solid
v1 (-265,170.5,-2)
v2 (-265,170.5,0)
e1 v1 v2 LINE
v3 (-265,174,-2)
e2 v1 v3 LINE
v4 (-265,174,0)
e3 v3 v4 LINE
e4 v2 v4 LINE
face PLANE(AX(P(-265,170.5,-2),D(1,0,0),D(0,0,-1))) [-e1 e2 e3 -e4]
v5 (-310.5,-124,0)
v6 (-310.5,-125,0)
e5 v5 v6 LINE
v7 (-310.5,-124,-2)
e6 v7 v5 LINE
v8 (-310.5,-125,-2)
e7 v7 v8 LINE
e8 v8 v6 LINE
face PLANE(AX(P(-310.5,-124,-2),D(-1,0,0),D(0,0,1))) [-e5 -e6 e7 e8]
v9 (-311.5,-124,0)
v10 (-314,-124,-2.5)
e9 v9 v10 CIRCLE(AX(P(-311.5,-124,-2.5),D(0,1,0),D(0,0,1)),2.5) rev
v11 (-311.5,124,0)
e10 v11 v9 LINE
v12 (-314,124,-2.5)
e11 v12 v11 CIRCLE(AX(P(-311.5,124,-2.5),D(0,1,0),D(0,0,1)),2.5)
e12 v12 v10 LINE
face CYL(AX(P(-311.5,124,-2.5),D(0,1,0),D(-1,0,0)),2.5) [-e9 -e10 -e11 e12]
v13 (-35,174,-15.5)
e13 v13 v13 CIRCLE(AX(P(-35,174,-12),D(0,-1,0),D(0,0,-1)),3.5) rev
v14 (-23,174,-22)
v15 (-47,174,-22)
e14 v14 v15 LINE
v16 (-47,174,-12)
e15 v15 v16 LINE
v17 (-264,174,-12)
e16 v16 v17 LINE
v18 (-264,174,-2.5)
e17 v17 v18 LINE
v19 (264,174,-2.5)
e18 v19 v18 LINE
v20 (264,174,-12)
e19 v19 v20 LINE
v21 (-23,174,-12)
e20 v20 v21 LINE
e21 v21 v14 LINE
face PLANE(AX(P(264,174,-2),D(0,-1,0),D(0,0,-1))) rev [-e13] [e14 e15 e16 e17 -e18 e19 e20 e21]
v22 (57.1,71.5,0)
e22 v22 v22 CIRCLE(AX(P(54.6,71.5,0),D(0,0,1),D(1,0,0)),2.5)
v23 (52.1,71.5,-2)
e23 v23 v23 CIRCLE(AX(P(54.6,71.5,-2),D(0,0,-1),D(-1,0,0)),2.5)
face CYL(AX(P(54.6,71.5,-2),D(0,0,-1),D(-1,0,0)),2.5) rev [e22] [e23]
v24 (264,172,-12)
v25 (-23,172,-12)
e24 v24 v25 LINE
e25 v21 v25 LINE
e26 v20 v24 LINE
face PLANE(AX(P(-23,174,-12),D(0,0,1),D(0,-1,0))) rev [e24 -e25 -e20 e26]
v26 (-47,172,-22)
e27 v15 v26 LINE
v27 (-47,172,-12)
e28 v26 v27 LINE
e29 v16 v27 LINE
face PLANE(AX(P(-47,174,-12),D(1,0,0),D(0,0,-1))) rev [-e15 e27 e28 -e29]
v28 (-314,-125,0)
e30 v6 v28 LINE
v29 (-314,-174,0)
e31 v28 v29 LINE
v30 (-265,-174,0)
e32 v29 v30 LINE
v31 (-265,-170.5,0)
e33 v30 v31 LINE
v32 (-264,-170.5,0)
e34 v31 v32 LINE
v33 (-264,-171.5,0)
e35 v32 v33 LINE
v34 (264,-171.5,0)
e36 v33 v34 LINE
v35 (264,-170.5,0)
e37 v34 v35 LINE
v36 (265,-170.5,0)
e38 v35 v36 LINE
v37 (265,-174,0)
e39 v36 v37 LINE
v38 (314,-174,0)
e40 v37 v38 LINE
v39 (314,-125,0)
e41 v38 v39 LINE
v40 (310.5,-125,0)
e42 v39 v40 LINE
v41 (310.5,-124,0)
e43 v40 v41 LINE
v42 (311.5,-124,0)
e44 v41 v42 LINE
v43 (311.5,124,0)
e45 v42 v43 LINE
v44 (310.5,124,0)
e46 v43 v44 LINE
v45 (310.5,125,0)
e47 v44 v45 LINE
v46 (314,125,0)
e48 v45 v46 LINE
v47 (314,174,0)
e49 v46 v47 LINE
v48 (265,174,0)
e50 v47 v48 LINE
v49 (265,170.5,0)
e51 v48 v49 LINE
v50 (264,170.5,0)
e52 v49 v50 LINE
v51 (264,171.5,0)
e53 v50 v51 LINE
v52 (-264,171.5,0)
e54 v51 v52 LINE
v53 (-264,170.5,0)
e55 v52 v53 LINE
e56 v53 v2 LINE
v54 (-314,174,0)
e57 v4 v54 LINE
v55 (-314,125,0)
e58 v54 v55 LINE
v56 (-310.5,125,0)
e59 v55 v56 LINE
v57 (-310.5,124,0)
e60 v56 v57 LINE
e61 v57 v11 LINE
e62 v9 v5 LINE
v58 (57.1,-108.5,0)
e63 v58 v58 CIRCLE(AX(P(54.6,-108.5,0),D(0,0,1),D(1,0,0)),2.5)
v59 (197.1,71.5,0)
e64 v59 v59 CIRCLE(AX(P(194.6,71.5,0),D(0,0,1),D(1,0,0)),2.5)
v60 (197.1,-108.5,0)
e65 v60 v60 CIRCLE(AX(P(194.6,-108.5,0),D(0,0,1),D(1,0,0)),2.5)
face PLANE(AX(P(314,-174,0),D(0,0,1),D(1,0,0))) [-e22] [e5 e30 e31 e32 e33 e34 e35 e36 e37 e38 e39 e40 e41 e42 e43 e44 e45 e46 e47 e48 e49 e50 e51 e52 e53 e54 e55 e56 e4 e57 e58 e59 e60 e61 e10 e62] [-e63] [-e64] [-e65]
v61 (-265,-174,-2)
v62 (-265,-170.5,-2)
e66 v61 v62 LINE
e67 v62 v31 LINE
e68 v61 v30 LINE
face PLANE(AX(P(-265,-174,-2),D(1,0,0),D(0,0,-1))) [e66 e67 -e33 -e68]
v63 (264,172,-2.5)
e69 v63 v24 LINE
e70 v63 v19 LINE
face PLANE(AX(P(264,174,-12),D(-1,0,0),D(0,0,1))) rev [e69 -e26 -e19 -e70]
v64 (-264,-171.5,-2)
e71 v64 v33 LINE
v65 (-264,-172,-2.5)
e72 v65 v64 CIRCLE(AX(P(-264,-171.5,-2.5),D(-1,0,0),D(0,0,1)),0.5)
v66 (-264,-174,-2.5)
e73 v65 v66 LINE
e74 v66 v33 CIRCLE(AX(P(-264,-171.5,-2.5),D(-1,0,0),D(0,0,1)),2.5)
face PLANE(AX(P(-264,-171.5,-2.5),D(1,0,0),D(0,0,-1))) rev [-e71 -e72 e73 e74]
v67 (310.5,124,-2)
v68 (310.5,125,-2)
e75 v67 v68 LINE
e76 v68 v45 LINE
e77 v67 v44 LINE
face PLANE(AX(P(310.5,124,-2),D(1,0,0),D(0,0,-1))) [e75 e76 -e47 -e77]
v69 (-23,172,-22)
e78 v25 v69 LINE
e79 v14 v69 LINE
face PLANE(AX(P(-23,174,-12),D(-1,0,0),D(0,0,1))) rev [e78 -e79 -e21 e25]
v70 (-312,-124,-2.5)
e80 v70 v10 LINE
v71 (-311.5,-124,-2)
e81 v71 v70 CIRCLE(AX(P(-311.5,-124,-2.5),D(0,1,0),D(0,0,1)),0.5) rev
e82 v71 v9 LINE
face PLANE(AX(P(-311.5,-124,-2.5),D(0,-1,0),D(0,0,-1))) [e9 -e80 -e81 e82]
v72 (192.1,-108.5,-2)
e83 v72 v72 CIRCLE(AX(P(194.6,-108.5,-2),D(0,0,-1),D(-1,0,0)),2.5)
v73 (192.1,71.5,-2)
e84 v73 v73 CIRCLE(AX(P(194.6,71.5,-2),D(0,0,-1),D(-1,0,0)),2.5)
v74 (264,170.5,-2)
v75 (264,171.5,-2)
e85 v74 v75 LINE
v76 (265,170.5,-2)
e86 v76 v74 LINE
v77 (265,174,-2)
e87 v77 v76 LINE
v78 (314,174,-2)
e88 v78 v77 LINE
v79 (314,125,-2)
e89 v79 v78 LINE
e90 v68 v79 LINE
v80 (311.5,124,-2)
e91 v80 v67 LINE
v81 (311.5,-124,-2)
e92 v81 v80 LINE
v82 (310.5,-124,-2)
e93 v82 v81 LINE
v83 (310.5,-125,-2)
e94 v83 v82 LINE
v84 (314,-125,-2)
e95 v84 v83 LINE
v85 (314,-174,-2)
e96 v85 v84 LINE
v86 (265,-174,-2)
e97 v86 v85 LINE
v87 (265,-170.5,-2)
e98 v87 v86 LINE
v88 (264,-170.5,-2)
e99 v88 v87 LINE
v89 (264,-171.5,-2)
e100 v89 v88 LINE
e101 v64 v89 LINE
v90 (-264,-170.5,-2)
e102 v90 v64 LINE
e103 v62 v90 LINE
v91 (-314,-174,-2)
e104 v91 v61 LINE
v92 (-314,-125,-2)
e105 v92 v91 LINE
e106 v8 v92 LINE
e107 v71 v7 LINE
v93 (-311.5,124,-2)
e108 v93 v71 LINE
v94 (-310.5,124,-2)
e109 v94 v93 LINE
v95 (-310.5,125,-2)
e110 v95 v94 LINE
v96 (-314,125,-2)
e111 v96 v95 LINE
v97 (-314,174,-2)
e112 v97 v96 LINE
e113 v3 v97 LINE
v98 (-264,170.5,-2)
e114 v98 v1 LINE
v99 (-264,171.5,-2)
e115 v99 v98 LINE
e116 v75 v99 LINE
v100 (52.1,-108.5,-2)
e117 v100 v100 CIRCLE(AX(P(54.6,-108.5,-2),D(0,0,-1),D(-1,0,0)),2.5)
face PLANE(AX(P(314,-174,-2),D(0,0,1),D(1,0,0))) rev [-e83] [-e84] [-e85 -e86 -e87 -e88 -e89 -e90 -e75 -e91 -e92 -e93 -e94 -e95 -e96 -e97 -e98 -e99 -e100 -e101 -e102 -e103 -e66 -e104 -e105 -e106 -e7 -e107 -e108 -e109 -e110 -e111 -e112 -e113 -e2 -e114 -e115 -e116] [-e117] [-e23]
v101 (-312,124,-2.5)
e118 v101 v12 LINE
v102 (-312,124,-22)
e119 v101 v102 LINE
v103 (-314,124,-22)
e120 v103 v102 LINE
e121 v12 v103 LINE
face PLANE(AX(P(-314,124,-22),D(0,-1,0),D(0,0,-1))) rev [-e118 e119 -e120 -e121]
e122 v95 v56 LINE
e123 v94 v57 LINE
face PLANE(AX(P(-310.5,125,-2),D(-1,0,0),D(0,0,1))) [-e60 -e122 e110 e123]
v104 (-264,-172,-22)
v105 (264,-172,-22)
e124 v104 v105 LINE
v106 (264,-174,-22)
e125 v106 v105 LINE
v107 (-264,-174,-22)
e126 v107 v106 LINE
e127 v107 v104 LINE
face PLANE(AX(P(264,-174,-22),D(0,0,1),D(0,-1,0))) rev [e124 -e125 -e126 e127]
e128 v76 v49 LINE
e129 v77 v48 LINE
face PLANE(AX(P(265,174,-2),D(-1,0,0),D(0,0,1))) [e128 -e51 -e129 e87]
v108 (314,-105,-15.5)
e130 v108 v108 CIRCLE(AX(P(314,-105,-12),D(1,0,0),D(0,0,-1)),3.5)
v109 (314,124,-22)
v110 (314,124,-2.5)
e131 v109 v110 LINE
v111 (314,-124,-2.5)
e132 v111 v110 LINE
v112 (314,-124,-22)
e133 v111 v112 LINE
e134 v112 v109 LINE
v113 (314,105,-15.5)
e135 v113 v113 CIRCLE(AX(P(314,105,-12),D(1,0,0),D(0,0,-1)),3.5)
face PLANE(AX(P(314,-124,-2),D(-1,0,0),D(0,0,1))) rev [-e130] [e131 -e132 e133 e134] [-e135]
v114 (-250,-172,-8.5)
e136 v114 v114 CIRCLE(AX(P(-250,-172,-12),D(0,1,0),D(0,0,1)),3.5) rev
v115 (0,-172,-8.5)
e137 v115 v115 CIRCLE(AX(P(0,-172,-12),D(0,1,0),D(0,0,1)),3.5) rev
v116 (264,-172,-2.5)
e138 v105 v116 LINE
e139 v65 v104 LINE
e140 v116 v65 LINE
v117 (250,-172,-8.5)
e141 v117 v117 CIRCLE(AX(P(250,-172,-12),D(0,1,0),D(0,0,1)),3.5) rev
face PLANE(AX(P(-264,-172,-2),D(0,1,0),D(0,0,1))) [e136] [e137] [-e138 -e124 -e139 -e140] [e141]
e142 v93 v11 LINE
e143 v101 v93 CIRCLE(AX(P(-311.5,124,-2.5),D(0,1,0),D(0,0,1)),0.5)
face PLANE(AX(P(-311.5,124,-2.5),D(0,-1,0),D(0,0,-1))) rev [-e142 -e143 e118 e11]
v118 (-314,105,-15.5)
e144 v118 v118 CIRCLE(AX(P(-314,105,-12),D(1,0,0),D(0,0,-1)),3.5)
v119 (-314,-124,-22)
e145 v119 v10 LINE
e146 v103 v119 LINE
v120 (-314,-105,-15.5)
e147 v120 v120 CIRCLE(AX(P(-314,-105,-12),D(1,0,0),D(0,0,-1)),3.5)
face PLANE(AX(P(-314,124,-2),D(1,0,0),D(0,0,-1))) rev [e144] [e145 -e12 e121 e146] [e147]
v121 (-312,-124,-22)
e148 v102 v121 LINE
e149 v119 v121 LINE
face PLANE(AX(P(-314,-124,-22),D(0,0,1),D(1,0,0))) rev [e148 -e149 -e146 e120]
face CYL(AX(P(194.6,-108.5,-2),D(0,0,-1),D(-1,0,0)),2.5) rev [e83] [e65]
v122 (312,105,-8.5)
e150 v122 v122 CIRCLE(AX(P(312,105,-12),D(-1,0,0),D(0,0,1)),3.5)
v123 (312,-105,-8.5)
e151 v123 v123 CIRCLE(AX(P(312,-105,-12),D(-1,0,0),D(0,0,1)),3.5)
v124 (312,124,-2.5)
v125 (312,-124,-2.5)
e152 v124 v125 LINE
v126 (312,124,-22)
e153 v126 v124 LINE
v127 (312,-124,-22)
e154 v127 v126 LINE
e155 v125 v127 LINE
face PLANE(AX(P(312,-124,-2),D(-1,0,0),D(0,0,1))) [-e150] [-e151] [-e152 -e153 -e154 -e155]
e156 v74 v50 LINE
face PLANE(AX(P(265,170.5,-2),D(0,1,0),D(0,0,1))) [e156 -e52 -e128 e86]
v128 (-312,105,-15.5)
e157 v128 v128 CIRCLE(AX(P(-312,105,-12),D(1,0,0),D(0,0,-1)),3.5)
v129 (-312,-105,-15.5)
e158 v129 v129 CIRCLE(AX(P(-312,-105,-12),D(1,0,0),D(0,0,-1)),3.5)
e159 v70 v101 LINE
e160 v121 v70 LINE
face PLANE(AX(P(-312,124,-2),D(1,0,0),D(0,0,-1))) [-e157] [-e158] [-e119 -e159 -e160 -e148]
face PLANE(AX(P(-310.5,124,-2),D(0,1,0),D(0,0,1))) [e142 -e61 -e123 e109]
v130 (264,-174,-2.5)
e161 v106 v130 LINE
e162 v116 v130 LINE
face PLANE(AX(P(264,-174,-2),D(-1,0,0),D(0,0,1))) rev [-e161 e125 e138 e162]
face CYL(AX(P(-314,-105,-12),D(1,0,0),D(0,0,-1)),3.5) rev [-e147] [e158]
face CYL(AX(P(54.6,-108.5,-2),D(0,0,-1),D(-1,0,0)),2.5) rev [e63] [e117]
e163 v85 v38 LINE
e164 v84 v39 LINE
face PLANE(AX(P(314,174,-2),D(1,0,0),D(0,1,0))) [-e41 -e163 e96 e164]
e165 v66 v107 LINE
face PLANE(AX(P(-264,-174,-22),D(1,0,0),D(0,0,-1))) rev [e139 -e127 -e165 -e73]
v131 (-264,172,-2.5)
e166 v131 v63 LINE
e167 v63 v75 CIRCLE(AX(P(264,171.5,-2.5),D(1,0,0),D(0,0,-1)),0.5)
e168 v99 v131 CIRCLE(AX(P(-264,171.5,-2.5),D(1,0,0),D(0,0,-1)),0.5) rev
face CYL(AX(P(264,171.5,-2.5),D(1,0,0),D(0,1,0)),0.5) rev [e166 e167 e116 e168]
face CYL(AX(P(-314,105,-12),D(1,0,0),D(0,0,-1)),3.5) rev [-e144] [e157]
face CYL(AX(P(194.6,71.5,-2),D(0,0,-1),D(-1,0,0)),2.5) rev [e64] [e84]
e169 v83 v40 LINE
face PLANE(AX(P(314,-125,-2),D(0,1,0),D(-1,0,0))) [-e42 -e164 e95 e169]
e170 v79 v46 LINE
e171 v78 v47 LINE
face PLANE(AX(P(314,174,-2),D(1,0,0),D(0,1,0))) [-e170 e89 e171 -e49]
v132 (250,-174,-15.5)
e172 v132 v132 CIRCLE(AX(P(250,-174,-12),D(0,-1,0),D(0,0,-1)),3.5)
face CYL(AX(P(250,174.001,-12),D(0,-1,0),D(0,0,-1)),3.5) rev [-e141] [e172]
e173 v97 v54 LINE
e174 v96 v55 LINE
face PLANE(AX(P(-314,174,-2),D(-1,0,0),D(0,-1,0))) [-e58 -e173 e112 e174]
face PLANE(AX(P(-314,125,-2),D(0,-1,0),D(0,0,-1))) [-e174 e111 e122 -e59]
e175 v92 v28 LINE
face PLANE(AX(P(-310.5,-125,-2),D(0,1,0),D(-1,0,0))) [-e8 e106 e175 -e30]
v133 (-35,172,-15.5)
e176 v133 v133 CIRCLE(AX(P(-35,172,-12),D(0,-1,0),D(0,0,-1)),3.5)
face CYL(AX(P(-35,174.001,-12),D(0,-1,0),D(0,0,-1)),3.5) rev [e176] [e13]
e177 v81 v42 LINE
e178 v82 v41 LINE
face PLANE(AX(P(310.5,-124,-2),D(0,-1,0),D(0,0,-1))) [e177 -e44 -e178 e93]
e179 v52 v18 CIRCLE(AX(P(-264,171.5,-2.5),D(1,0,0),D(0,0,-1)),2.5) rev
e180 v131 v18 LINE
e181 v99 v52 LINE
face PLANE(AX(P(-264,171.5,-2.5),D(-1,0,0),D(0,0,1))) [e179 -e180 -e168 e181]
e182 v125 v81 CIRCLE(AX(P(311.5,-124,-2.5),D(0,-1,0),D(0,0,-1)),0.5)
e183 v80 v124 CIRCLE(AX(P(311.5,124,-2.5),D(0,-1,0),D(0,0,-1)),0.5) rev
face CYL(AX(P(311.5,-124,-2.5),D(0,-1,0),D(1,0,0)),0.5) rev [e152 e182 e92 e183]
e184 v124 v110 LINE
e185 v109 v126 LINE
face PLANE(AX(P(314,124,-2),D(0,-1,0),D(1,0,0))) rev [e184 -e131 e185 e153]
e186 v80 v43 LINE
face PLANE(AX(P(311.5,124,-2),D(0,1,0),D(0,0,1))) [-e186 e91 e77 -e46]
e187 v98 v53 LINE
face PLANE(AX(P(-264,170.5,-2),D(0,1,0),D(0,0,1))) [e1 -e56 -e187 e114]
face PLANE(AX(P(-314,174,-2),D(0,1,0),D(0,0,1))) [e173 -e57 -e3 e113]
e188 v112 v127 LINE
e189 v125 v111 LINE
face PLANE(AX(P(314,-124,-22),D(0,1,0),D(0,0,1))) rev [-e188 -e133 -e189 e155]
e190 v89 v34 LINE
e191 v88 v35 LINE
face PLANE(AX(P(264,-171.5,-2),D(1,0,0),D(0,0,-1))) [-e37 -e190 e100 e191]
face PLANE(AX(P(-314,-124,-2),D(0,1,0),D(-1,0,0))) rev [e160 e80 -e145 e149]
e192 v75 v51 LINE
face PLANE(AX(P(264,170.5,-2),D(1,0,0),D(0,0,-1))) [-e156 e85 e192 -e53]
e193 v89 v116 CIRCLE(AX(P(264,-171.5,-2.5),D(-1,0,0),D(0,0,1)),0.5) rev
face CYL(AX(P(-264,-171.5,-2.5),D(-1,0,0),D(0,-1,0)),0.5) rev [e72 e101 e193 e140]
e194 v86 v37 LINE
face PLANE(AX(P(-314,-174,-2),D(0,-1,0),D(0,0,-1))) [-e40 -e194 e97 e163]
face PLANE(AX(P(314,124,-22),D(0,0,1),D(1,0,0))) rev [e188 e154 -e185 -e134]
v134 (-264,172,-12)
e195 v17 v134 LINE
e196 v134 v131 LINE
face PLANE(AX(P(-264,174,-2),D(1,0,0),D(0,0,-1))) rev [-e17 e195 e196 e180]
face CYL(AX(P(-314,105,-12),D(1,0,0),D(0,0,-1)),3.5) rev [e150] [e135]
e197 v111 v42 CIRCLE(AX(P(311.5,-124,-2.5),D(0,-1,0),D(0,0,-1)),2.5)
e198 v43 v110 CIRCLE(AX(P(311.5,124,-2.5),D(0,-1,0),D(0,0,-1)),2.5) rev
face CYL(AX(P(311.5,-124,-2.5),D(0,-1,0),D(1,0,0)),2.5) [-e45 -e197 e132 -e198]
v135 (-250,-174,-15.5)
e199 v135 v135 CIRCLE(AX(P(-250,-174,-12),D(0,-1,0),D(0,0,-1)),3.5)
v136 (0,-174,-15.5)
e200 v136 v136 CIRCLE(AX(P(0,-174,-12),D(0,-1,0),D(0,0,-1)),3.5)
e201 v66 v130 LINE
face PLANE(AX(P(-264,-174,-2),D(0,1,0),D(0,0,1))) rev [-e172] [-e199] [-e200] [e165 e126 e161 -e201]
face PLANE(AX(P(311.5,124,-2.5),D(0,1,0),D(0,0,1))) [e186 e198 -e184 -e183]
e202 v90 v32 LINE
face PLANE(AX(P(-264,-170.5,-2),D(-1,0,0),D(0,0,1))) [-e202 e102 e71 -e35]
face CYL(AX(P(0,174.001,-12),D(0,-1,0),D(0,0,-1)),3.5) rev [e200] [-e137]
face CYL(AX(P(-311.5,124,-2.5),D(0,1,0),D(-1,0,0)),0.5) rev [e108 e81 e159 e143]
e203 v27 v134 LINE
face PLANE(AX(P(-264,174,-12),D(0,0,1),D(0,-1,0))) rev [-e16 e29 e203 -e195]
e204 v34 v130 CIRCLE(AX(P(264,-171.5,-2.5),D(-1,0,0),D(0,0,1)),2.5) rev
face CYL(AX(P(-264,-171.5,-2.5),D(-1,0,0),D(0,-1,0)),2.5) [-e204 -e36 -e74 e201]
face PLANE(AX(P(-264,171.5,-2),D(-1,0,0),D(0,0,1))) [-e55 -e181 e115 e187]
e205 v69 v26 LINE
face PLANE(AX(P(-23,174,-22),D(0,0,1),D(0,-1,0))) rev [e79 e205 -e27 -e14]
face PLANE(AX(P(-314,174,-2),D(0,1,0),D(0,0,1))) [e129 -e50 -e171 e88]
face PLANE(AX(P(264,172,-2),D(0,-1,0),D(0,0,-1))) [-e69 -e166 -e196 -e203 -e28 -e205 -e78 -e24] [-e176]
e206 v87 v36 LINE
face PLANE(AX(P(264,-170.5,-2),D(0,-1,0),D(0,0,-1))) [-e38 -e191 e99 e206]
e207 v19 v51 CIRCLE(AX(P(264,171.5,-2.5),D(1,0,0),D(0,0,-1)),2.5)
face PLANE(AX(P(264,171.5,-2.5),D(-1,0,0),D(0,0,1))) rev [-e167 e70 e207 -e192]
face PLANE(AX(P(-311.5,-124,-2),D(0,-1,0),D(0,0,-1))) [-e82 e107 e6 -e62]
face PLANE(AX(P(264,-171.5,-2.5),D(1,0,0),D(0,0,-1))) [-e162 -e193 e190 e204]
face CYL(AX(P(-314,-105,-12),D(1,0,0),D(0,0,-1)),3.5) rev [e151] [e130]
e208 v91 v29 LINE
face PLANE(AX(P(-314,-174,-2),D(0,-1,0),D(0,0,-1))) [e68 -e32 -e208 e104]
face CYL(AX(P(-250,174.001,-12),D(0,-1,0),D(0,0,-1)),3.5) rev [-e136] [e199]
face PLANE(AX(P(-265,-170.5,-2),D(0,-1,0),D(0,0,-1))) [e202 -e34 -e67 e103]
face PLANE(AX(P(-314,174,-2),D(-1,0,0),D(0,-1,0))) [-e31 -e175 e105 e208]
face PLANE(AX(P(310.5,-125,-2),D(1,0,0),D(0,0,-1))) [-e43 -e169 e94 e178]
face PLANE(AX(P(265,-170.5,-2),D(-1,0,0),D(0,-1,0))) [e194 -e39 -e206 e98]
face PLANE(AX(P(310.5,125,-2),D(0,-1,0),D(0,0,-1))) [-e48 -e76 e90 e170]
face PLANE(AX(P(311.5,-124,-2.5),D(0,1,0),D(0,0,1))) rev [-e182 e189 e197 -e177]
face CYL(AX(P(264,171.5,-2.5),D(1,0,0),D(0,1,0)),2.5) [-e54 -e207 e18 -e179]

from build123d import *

# Parameters (mm, degrees)
SKETCH_1_W                        = 628
SKETCH_1_H                        = 348
SM_BASE_FLANGE_1_DEPTH            = 2
SM_EDGE_FLANGE_1_STRIP_W          = 9
SM_EDGE_FLANGE_1_STRIP_H          = 2
SM_EDGE_FLANGE_1_STRIP_CUT_DEPTH  = 248
SM_EDGE_FLANGE_1_RELIEF_W         = 10
SM_EDGE_FLANGE_1_RELIEF_H         = 1
SM_EDGE_FLANGE_1_RELIEF_CUT_DEPTH = 2
SM_EDGE_FLANGE_1_DEPTH            = 248
SM_EDGE_FLANGE_2_STRIP_W          = 9
SM_EDGE_FLANGE_2_STRIP_H          = 2
SM_EDGE_FLANGE_2_STRIP_CUT_DEPTH  = 528
SM_EDGE_FLANGE_2_RELIEF_W         = 10
SM_EDGE_FLANGE_2_RELIEF_H         = 1
SM_EDGE_FLANGE_2_RELIEF_CUT_DEPTH = 2
SM_EDGE_FLANGE_2_DEPTH            = 528
SM_EDGE_FLANGE_2_FLAT_DEPTH       = 2
SM_EDGE_FLANGE_3_STRIP_W          = 9
SM_EDGE_FLANGE_3_STRIP_H          = 2
SM_EDGE_FLANGE_3_STRIP_CUT_DEPTH  = 248
SM_EDGE_FLANGE_3_RELIEF_W         = 10
SM_EDGE_FLANGE_3_RELIEF_H         = 1
SM_EDGE_FLANGE_3_RELIEF_CUT_DEPTH = 2
SM_EDGE_FLANGE_3_DEPTH            = 248
SM_EDGE_FLANGE_4_STRIP_W          = 9
SM_EDGE_FLANGE_4_STRIP_H          = 2
SM_EDGE_FLANGE_4_STRIP_CUT_DEPTH  = 528
SM_EDGE_FLANGE_4_RELIEF_W         = 10
SM_EDGE_FLANGE_4_RELIEF_H         = 1
SM_EDGE_FLANGE_4_RELIEF_CUT_DEPTH = 2
SM_EDGE_FLANGE_4_DEPTH            = 528
SKETCH_15_R                       = 3.5
CUT_EXTRUDE_1_DEPTH               = 653.030674125
CUT_EXTRUDE_2_REACH               = 469.756
SKETCH_16_R                       = 3.5
HOLE_WIZARD_M6_1_D                = 5
HOLE_WIZARD_M6_1_DEPTH            = 15
HOLE_WIZARD_M6_1_TIP              = 1.502151548
CUT_EXTRUDE_3_REACH               = 471.238
SKETCH_20_R                       = 3.5


# Sheet-metal steps are written as plain solids
with BuildPart() as part:
    # Sketch 1 → 基体-法兰1 (new body)
    with BuildSketch(Plane.XY):
        Rectangle(SKETCH_1_W, SKETCH_1_H)
    extrude(amount=-SM_BASE_FLANGE_1_DEPTH)

    # 边线-法兰1 strip (across the edge) → 边线-法兰1 strip cut (cut)
    with BuildSketch(Plane(origin=(314, 124, -2), x_dir=(-1, 0, 0), z_dir=(0, -1, 0))):
        with Locations((-2, -1)):
            Rectangle(SM_EDGE_FLANGE_1_STRIP_W, SM_EDGE_FLANGE_1_STRIP_H)
    extrude(amount=SM_EDGE_FLANGE_1_STRIP_CUT_DEPTH, mode=Mode.SUBTRACT)

    # 边线-法兰1 relief (on the sheet) → 边线-法兰1 relief cut (cut)
    with BuildSketch(Plane(origin=(311.5, 124, -2), x_dir=(-1, 0, 0), z_dir=(0, 0, -1))):
        with Locations((-4, 0.5)):
            Rectangle(SM_EDGE_FLANGE_1_RELIEF_W, SM_EDGE_FLANGE_1_RELIEF_H)
        with Locations((-4, -248.5)):
            Rectangle(SM_EDGE_FLANGE_1_RELIEF_W, SM_EDGE_FLANGE_1_RELIEF_H)
    extrude(amount=-SM_EDGE_FLANGE_1_RELIEF_CUT_DEPTH, mode=Mode.SUBTRACT)

    # 边线-法兰1 section (across the edge) → 边线-法兰1 (add)
    with BuildSketch(Plane(origin=(314, 124, -2), x_dir=(-1, 0, 0), z_dir=(0, -1, 0))):
        with BuildLine():
            Line((0, 0.5), (0, 20))
            Line((0, 20), (2, 20))
            Line((2, 20), (2, 0.5))
            ThreePointArc((2, 0.5), (2.146446609, 0.146446609), (2.5, 0))
            Line((2.5, 0), (2.5, -2))
            ThreePointArc((2.5, -2), (0.732233047, -1.267766953), (0, 0.5))
        make_face()
    extrude(amount=SM_EDGE_FLANGE_1_DEPTH)

    # 边线-法兰2 strip (across the edge) → 边线-法兰2 strip cut (cut)
    with BuildSketch(Plane(origin=(-264, 174, -2), x_dir=(0, -1, 0), z_dir=(1, 0, 0))):
        with Locations((-2, -1)):
            Rectangle(SM_EDGE_FLANGE_2_STRIP_W, SM_EDGE_FLANGE_2_STRIP_H)
    extrude(amount=SM_EDGE_FLANGE_2_STRIP_CUT_DEPTH, mode=Mode.SUBTRACT)

    # 边线-法兰2 relief (on the sheet) → 边线-法兰2 relief cut (cut)
    with BuildSketch(Plane(origin=(-264, 171.5, -2), x_dir=(0, -1, 0), z_dir=(0, 0, -1))):
        with Locations((-4, 0.5)):
            Rectangle(SM_EDGE_FLANGE_2_RELIEF_W, SM_EDGE_FLANGE_2_RELIEF_H)
        with Locations((-4, -528.5)):
            Rectangle(SM_EDGE_FLANGE_2_RELIEF_W, SM_EDGE_FLANGE_2_RELIEF_H)
    extrude(amount=-SM_EDGE_FLANGE_2_RELIEF_CUT_DEPTH, mode=Mode.SUBTRACT)

    # 边线-法兰2 bend section (across the edge) → 边线-法兰2 (add)
    with BuildSketch(Plane(origin=(-264, 174, -2), x_dir=(0, -1, 0), z_dir=(1, 0, 0))):
        with BuildLine():
            Line((0, 0.5), (2, 0.5))
            ThreePointArc((2, 0.5), (2.146446609, 0.146446609), (2.5, 0))
            Line((2.5, 0), (2.5, -2))
            ThreePointArc((2.5, -2), (0.732233047, -1.267766953), (0, 0.5))
        make_face()
    extrude(amount=SM_EDGE_FLANGE_2_DEPTH)

    # 边线-法兰2 profile (on flange) → 边线-法兰2 flat (add)
    with BuildSketch(Plane(origin=(0, 174, -2), x_dir=(1, 0, 0), z_dir=(0, 1, 0))):
        Polygon((264, 0.5), (264, 10), (-23, 10), (-23, 20), (-47, 20), (-47, 10), (-264, 10), (-264, 0.5), align=None)
    extrude(amount=-SM_EDGE_FLANGE_2_FLAT_DEPTH)

    # 边线-法兰3 strip (across the edge) → 边线-法兰3 strip cut (cut)
    with BuildSketch(Plane(origin=(-314, -124, -2), x_dir=(1, 0, 0), z_dir=(0, 1, 0))):
        with Locations((-2, -1)):
            Rectangle(SM_EDGE_FLANGE_3_STRIP_W, SM_EDGE_FLANGE_3_STRIP_H)
    extrude(amount=SM_EDGE_FLANGE_3_STRIP_CUT_DEPTH, mode=Mode.SUBTRACT)

    # 边线-法兰3 relief (on the sheet) → 边线-法兰3 relief cut (cut)
    with BuildSketch(Plane(origin=(-311.5, -124, -2), x_dir=(1, 0, 0), z_dir=(0, 0, -1))):
        with Locations((-4, 0.5)):
            Rectangle(SM_EDGE_FLANGE_3_RELIEF_W, SM_EDGE_FLANGE_3_RELIEF_H)
        with Locations((-4, -248.5)):
            Rectangle(SM_EDGE_FLANGE_3_RELIEF_W, SM_EDGE_FLANGE_3_RELIEF_H)
    extrude(amount=-SM_EDGE_FLANGE_3_RELIEF_CUT_DEPTH, mode=Mode.SUBTRACT)

    # 边线-法兰3 section (across the edge) → 边线-法兰3 (add)
    with BuildSketch(Plane(origin=(-314, -124, -2), x_dir=(1, 0, 0), z_dir=(0, 1, 0))):
        with BuildLine():
            Line((0, 0.5), (0, 20))
            Line((0, 20), (2, 20))
            Line((2, 20), (2, 0.5))
            ThreePointArc((2, 0.5), (2.146446609, 0.146446609), (2.5, 0))
            Line((2.5, 0), (2.5, -2))
            ThreePointArc((2.5, -2), (0.732233047, -1.267766953), (0, 0.5))
        make_face()
    extrude(amount=SM_EDGE_FLANGE_3_DEPTH)

    # 边线-法兰4 strip (across the edge) → 边线-法兰4 strip cut (cut)
    with BuildSketch(Plane(origin=(264, -174, -2), x_dir=(0, 1, 0), z_dir=(-1, 0, 0))):
        with Locations((-2, -1)):
            Rectangle(SM_EDGE_FLANGE_4_STRIP_W, SM_EDGE_FLANGE_4_STRIP_H)
    extrude(amount=SM_EDGE_FLANGE_4_STRIP_CUT_DEPTH, mode=Mode.SUBTRACT)

    # 边线-法兰4 relief (on the sheet) → 边线-法兰4 relief cut (cut)
    with BuildSketch(Plane(origin=(264, -171.5, -2), x_dir=(0, 1, 0), z_dir=(0, 0, -1))):
        with Locations((-4, 0.5)):
            Rectangle(SM_EDGE_FLANGE_4_RELIEF_W, SM_EDGE_FLANGE_4_RELIEF_H)
        with Locations((-4, -528.5)):
            Rectangle(SM_EDGE_FLANGE_4_RELIEF_W, SM_EDGE_FLANGE_4_RELIEF_H)
    extrude(amount=-SM_EDGE_FLANGE_4_RELIEF_CUT_DEPTH, mode=Mode.SUBTRACT)

    # 边线-法兰4 section (across the edge) → 边线-法兰4 (add)
    with BuildSketch(Plane(origin=(264, -174, -2), x_dir=(0, 1, 0), z_dir=(-1, 0, 0))):
        with BuildLine():
            Line((0, 0.5), (0, 20))
            Line((0, 20), (2, 20))
            Line((2, 20), (2, 0.5))
            ThreePointArc((2, 0.5), (2.146446609, 0.146446609), (2.5, 0))
            Line((2.5, 0), (2.5, -2))
            ThreePointArc((2.5, -2), (0.732233047, -1.267766953), (0, 0.5))
        make_face()
    extrude(amount=SM_EDGE_FLANGE_4_DEPTH)

    # 草图15 → 切除-拉伸1 (cut, through all)
    with BuildSketch(Plane(origin=(314, 0, 0), x_dir=(0, 0, -1), z_dir=(1, 0, 0))):
        with Locations((12, -105)):
            Circle(SKETCH_15_R)
        with Locations((12, 105)):
            Circle(SKETCH_15_R)
    extrude(amount=-CUT_EXTRUDE_1_DEPTH, mode=Mode.SUBTRACT)

    # 草图16 → 切除-拉伸2 (cut, up to next)
    with BuildSketch(Plane.XZ.offset(-172), mode=Mode.PRIVATE) as cut_extrude_2_sk1:
        with Locations(Location((-35, -12, 0), (0, 0, 270))):
            Circle(SKETCH_16_R)
    cut_extrude_2_tool1 = extrude(cut_extrude_2_sk1.sketch, amount=-CUT_EXTRUDE_2_REACH, mode=Mode.PRIVATE) & part.part
    add(cut_extrude_2_tool1.solids().sort_by_distance((-35, 172, -12))[0], mode=Mode.SUBTRACT)

    # M6 螺纹孔1
    with Locations(Plane(origin=(0, 0, -2), x_dir=(-1, 0, 0), z_dir=(0, 0, -1))):
        with Locations((-194.6, 71.5), (-54.6, 71.5), (-54.6, -108.5), (-194.6, -108.5)):
            Hole(HOLE_WIZARD_M6_1_D / 2, depth=HOLE_WIZARD_M6_1_DEPTH)
            with Locations((0, 0, -(HOLE_WIZARD_M6_1_DEPTH + HOLE_WIZARD_M6_1_TIP / 2))):  # 118° drill point
                Cone(0, HOLE_WIZARD_M6_1_D / 2, HOLE_WIZARD_M6_1_TIP, mode=Mode.SUBTRACT)

    # 草图20 → 切除-拉伸3 (cut, up to next)
    with BuildSketch(Plane.XZ.offset(174), mode=Mode.PRIVATE) as cut_extrude_3_sk1:
        with Locations(Location((0, -12, 0), (0, 0, 270))):
            Circle(SKETCH_20_R)
    cut_extrude_3_tool1 = extrude(cut_extrude_3_sk1.sketch, amount=-CUT_EXTRUDE_3_REACH, mode=Mode.PRIVATE) & part.part
    # 草图20 → 切除-拉伸3 (cut, up to next)
    with BuildSketch(Plane.XZ.offset(174), mode=Mode.PRIVATE) as cut_extrude_3_sk2:
        with Locations(Location((-250, -12, 0), (0, 0, 270))):
            Circle(SKETCH_20_R)
    cut_extrude_3_tool2 = extrude(cut_extrude_3_sk2.sketch, amount=-CUT_EXTRUDE_3_REACH, mode=Mode.PRIVATE) & part.part
    # 草图20 → 切除-拉伸3 (cut, up to next)
    with BuildSketch(Plane.XZ.offset(174), mode=Mode.PRIVATE) as cut_extrude_3_sk3:
        with Locations(Location((250, -12, 0), (0, 0, 270))):
            Circle(SKETCH_20_R)
    cut_extrude_3_tool3 = extrude(cut_extrude_3_sk3.sketch, amount=-CUT_EXTRUDE_3_REACH, mode=Mode.PRIVATE) & part.part
    add(cut_extrude_3_tool1.solids().sort_by_distance((0, -174, -12))[0], mode=Mode.SUBTRACT)
    add(cut_extrude_3_tool2.solids().sort_by_distance((-250, -174, -12))[0], mode=Mode.SUBTRACT)
    add(cut_extrude_3_tool3.solids().sort_by_distance((250, -174, -12))[0], mode=Mode.SUBTRACT)


solid = part.part
